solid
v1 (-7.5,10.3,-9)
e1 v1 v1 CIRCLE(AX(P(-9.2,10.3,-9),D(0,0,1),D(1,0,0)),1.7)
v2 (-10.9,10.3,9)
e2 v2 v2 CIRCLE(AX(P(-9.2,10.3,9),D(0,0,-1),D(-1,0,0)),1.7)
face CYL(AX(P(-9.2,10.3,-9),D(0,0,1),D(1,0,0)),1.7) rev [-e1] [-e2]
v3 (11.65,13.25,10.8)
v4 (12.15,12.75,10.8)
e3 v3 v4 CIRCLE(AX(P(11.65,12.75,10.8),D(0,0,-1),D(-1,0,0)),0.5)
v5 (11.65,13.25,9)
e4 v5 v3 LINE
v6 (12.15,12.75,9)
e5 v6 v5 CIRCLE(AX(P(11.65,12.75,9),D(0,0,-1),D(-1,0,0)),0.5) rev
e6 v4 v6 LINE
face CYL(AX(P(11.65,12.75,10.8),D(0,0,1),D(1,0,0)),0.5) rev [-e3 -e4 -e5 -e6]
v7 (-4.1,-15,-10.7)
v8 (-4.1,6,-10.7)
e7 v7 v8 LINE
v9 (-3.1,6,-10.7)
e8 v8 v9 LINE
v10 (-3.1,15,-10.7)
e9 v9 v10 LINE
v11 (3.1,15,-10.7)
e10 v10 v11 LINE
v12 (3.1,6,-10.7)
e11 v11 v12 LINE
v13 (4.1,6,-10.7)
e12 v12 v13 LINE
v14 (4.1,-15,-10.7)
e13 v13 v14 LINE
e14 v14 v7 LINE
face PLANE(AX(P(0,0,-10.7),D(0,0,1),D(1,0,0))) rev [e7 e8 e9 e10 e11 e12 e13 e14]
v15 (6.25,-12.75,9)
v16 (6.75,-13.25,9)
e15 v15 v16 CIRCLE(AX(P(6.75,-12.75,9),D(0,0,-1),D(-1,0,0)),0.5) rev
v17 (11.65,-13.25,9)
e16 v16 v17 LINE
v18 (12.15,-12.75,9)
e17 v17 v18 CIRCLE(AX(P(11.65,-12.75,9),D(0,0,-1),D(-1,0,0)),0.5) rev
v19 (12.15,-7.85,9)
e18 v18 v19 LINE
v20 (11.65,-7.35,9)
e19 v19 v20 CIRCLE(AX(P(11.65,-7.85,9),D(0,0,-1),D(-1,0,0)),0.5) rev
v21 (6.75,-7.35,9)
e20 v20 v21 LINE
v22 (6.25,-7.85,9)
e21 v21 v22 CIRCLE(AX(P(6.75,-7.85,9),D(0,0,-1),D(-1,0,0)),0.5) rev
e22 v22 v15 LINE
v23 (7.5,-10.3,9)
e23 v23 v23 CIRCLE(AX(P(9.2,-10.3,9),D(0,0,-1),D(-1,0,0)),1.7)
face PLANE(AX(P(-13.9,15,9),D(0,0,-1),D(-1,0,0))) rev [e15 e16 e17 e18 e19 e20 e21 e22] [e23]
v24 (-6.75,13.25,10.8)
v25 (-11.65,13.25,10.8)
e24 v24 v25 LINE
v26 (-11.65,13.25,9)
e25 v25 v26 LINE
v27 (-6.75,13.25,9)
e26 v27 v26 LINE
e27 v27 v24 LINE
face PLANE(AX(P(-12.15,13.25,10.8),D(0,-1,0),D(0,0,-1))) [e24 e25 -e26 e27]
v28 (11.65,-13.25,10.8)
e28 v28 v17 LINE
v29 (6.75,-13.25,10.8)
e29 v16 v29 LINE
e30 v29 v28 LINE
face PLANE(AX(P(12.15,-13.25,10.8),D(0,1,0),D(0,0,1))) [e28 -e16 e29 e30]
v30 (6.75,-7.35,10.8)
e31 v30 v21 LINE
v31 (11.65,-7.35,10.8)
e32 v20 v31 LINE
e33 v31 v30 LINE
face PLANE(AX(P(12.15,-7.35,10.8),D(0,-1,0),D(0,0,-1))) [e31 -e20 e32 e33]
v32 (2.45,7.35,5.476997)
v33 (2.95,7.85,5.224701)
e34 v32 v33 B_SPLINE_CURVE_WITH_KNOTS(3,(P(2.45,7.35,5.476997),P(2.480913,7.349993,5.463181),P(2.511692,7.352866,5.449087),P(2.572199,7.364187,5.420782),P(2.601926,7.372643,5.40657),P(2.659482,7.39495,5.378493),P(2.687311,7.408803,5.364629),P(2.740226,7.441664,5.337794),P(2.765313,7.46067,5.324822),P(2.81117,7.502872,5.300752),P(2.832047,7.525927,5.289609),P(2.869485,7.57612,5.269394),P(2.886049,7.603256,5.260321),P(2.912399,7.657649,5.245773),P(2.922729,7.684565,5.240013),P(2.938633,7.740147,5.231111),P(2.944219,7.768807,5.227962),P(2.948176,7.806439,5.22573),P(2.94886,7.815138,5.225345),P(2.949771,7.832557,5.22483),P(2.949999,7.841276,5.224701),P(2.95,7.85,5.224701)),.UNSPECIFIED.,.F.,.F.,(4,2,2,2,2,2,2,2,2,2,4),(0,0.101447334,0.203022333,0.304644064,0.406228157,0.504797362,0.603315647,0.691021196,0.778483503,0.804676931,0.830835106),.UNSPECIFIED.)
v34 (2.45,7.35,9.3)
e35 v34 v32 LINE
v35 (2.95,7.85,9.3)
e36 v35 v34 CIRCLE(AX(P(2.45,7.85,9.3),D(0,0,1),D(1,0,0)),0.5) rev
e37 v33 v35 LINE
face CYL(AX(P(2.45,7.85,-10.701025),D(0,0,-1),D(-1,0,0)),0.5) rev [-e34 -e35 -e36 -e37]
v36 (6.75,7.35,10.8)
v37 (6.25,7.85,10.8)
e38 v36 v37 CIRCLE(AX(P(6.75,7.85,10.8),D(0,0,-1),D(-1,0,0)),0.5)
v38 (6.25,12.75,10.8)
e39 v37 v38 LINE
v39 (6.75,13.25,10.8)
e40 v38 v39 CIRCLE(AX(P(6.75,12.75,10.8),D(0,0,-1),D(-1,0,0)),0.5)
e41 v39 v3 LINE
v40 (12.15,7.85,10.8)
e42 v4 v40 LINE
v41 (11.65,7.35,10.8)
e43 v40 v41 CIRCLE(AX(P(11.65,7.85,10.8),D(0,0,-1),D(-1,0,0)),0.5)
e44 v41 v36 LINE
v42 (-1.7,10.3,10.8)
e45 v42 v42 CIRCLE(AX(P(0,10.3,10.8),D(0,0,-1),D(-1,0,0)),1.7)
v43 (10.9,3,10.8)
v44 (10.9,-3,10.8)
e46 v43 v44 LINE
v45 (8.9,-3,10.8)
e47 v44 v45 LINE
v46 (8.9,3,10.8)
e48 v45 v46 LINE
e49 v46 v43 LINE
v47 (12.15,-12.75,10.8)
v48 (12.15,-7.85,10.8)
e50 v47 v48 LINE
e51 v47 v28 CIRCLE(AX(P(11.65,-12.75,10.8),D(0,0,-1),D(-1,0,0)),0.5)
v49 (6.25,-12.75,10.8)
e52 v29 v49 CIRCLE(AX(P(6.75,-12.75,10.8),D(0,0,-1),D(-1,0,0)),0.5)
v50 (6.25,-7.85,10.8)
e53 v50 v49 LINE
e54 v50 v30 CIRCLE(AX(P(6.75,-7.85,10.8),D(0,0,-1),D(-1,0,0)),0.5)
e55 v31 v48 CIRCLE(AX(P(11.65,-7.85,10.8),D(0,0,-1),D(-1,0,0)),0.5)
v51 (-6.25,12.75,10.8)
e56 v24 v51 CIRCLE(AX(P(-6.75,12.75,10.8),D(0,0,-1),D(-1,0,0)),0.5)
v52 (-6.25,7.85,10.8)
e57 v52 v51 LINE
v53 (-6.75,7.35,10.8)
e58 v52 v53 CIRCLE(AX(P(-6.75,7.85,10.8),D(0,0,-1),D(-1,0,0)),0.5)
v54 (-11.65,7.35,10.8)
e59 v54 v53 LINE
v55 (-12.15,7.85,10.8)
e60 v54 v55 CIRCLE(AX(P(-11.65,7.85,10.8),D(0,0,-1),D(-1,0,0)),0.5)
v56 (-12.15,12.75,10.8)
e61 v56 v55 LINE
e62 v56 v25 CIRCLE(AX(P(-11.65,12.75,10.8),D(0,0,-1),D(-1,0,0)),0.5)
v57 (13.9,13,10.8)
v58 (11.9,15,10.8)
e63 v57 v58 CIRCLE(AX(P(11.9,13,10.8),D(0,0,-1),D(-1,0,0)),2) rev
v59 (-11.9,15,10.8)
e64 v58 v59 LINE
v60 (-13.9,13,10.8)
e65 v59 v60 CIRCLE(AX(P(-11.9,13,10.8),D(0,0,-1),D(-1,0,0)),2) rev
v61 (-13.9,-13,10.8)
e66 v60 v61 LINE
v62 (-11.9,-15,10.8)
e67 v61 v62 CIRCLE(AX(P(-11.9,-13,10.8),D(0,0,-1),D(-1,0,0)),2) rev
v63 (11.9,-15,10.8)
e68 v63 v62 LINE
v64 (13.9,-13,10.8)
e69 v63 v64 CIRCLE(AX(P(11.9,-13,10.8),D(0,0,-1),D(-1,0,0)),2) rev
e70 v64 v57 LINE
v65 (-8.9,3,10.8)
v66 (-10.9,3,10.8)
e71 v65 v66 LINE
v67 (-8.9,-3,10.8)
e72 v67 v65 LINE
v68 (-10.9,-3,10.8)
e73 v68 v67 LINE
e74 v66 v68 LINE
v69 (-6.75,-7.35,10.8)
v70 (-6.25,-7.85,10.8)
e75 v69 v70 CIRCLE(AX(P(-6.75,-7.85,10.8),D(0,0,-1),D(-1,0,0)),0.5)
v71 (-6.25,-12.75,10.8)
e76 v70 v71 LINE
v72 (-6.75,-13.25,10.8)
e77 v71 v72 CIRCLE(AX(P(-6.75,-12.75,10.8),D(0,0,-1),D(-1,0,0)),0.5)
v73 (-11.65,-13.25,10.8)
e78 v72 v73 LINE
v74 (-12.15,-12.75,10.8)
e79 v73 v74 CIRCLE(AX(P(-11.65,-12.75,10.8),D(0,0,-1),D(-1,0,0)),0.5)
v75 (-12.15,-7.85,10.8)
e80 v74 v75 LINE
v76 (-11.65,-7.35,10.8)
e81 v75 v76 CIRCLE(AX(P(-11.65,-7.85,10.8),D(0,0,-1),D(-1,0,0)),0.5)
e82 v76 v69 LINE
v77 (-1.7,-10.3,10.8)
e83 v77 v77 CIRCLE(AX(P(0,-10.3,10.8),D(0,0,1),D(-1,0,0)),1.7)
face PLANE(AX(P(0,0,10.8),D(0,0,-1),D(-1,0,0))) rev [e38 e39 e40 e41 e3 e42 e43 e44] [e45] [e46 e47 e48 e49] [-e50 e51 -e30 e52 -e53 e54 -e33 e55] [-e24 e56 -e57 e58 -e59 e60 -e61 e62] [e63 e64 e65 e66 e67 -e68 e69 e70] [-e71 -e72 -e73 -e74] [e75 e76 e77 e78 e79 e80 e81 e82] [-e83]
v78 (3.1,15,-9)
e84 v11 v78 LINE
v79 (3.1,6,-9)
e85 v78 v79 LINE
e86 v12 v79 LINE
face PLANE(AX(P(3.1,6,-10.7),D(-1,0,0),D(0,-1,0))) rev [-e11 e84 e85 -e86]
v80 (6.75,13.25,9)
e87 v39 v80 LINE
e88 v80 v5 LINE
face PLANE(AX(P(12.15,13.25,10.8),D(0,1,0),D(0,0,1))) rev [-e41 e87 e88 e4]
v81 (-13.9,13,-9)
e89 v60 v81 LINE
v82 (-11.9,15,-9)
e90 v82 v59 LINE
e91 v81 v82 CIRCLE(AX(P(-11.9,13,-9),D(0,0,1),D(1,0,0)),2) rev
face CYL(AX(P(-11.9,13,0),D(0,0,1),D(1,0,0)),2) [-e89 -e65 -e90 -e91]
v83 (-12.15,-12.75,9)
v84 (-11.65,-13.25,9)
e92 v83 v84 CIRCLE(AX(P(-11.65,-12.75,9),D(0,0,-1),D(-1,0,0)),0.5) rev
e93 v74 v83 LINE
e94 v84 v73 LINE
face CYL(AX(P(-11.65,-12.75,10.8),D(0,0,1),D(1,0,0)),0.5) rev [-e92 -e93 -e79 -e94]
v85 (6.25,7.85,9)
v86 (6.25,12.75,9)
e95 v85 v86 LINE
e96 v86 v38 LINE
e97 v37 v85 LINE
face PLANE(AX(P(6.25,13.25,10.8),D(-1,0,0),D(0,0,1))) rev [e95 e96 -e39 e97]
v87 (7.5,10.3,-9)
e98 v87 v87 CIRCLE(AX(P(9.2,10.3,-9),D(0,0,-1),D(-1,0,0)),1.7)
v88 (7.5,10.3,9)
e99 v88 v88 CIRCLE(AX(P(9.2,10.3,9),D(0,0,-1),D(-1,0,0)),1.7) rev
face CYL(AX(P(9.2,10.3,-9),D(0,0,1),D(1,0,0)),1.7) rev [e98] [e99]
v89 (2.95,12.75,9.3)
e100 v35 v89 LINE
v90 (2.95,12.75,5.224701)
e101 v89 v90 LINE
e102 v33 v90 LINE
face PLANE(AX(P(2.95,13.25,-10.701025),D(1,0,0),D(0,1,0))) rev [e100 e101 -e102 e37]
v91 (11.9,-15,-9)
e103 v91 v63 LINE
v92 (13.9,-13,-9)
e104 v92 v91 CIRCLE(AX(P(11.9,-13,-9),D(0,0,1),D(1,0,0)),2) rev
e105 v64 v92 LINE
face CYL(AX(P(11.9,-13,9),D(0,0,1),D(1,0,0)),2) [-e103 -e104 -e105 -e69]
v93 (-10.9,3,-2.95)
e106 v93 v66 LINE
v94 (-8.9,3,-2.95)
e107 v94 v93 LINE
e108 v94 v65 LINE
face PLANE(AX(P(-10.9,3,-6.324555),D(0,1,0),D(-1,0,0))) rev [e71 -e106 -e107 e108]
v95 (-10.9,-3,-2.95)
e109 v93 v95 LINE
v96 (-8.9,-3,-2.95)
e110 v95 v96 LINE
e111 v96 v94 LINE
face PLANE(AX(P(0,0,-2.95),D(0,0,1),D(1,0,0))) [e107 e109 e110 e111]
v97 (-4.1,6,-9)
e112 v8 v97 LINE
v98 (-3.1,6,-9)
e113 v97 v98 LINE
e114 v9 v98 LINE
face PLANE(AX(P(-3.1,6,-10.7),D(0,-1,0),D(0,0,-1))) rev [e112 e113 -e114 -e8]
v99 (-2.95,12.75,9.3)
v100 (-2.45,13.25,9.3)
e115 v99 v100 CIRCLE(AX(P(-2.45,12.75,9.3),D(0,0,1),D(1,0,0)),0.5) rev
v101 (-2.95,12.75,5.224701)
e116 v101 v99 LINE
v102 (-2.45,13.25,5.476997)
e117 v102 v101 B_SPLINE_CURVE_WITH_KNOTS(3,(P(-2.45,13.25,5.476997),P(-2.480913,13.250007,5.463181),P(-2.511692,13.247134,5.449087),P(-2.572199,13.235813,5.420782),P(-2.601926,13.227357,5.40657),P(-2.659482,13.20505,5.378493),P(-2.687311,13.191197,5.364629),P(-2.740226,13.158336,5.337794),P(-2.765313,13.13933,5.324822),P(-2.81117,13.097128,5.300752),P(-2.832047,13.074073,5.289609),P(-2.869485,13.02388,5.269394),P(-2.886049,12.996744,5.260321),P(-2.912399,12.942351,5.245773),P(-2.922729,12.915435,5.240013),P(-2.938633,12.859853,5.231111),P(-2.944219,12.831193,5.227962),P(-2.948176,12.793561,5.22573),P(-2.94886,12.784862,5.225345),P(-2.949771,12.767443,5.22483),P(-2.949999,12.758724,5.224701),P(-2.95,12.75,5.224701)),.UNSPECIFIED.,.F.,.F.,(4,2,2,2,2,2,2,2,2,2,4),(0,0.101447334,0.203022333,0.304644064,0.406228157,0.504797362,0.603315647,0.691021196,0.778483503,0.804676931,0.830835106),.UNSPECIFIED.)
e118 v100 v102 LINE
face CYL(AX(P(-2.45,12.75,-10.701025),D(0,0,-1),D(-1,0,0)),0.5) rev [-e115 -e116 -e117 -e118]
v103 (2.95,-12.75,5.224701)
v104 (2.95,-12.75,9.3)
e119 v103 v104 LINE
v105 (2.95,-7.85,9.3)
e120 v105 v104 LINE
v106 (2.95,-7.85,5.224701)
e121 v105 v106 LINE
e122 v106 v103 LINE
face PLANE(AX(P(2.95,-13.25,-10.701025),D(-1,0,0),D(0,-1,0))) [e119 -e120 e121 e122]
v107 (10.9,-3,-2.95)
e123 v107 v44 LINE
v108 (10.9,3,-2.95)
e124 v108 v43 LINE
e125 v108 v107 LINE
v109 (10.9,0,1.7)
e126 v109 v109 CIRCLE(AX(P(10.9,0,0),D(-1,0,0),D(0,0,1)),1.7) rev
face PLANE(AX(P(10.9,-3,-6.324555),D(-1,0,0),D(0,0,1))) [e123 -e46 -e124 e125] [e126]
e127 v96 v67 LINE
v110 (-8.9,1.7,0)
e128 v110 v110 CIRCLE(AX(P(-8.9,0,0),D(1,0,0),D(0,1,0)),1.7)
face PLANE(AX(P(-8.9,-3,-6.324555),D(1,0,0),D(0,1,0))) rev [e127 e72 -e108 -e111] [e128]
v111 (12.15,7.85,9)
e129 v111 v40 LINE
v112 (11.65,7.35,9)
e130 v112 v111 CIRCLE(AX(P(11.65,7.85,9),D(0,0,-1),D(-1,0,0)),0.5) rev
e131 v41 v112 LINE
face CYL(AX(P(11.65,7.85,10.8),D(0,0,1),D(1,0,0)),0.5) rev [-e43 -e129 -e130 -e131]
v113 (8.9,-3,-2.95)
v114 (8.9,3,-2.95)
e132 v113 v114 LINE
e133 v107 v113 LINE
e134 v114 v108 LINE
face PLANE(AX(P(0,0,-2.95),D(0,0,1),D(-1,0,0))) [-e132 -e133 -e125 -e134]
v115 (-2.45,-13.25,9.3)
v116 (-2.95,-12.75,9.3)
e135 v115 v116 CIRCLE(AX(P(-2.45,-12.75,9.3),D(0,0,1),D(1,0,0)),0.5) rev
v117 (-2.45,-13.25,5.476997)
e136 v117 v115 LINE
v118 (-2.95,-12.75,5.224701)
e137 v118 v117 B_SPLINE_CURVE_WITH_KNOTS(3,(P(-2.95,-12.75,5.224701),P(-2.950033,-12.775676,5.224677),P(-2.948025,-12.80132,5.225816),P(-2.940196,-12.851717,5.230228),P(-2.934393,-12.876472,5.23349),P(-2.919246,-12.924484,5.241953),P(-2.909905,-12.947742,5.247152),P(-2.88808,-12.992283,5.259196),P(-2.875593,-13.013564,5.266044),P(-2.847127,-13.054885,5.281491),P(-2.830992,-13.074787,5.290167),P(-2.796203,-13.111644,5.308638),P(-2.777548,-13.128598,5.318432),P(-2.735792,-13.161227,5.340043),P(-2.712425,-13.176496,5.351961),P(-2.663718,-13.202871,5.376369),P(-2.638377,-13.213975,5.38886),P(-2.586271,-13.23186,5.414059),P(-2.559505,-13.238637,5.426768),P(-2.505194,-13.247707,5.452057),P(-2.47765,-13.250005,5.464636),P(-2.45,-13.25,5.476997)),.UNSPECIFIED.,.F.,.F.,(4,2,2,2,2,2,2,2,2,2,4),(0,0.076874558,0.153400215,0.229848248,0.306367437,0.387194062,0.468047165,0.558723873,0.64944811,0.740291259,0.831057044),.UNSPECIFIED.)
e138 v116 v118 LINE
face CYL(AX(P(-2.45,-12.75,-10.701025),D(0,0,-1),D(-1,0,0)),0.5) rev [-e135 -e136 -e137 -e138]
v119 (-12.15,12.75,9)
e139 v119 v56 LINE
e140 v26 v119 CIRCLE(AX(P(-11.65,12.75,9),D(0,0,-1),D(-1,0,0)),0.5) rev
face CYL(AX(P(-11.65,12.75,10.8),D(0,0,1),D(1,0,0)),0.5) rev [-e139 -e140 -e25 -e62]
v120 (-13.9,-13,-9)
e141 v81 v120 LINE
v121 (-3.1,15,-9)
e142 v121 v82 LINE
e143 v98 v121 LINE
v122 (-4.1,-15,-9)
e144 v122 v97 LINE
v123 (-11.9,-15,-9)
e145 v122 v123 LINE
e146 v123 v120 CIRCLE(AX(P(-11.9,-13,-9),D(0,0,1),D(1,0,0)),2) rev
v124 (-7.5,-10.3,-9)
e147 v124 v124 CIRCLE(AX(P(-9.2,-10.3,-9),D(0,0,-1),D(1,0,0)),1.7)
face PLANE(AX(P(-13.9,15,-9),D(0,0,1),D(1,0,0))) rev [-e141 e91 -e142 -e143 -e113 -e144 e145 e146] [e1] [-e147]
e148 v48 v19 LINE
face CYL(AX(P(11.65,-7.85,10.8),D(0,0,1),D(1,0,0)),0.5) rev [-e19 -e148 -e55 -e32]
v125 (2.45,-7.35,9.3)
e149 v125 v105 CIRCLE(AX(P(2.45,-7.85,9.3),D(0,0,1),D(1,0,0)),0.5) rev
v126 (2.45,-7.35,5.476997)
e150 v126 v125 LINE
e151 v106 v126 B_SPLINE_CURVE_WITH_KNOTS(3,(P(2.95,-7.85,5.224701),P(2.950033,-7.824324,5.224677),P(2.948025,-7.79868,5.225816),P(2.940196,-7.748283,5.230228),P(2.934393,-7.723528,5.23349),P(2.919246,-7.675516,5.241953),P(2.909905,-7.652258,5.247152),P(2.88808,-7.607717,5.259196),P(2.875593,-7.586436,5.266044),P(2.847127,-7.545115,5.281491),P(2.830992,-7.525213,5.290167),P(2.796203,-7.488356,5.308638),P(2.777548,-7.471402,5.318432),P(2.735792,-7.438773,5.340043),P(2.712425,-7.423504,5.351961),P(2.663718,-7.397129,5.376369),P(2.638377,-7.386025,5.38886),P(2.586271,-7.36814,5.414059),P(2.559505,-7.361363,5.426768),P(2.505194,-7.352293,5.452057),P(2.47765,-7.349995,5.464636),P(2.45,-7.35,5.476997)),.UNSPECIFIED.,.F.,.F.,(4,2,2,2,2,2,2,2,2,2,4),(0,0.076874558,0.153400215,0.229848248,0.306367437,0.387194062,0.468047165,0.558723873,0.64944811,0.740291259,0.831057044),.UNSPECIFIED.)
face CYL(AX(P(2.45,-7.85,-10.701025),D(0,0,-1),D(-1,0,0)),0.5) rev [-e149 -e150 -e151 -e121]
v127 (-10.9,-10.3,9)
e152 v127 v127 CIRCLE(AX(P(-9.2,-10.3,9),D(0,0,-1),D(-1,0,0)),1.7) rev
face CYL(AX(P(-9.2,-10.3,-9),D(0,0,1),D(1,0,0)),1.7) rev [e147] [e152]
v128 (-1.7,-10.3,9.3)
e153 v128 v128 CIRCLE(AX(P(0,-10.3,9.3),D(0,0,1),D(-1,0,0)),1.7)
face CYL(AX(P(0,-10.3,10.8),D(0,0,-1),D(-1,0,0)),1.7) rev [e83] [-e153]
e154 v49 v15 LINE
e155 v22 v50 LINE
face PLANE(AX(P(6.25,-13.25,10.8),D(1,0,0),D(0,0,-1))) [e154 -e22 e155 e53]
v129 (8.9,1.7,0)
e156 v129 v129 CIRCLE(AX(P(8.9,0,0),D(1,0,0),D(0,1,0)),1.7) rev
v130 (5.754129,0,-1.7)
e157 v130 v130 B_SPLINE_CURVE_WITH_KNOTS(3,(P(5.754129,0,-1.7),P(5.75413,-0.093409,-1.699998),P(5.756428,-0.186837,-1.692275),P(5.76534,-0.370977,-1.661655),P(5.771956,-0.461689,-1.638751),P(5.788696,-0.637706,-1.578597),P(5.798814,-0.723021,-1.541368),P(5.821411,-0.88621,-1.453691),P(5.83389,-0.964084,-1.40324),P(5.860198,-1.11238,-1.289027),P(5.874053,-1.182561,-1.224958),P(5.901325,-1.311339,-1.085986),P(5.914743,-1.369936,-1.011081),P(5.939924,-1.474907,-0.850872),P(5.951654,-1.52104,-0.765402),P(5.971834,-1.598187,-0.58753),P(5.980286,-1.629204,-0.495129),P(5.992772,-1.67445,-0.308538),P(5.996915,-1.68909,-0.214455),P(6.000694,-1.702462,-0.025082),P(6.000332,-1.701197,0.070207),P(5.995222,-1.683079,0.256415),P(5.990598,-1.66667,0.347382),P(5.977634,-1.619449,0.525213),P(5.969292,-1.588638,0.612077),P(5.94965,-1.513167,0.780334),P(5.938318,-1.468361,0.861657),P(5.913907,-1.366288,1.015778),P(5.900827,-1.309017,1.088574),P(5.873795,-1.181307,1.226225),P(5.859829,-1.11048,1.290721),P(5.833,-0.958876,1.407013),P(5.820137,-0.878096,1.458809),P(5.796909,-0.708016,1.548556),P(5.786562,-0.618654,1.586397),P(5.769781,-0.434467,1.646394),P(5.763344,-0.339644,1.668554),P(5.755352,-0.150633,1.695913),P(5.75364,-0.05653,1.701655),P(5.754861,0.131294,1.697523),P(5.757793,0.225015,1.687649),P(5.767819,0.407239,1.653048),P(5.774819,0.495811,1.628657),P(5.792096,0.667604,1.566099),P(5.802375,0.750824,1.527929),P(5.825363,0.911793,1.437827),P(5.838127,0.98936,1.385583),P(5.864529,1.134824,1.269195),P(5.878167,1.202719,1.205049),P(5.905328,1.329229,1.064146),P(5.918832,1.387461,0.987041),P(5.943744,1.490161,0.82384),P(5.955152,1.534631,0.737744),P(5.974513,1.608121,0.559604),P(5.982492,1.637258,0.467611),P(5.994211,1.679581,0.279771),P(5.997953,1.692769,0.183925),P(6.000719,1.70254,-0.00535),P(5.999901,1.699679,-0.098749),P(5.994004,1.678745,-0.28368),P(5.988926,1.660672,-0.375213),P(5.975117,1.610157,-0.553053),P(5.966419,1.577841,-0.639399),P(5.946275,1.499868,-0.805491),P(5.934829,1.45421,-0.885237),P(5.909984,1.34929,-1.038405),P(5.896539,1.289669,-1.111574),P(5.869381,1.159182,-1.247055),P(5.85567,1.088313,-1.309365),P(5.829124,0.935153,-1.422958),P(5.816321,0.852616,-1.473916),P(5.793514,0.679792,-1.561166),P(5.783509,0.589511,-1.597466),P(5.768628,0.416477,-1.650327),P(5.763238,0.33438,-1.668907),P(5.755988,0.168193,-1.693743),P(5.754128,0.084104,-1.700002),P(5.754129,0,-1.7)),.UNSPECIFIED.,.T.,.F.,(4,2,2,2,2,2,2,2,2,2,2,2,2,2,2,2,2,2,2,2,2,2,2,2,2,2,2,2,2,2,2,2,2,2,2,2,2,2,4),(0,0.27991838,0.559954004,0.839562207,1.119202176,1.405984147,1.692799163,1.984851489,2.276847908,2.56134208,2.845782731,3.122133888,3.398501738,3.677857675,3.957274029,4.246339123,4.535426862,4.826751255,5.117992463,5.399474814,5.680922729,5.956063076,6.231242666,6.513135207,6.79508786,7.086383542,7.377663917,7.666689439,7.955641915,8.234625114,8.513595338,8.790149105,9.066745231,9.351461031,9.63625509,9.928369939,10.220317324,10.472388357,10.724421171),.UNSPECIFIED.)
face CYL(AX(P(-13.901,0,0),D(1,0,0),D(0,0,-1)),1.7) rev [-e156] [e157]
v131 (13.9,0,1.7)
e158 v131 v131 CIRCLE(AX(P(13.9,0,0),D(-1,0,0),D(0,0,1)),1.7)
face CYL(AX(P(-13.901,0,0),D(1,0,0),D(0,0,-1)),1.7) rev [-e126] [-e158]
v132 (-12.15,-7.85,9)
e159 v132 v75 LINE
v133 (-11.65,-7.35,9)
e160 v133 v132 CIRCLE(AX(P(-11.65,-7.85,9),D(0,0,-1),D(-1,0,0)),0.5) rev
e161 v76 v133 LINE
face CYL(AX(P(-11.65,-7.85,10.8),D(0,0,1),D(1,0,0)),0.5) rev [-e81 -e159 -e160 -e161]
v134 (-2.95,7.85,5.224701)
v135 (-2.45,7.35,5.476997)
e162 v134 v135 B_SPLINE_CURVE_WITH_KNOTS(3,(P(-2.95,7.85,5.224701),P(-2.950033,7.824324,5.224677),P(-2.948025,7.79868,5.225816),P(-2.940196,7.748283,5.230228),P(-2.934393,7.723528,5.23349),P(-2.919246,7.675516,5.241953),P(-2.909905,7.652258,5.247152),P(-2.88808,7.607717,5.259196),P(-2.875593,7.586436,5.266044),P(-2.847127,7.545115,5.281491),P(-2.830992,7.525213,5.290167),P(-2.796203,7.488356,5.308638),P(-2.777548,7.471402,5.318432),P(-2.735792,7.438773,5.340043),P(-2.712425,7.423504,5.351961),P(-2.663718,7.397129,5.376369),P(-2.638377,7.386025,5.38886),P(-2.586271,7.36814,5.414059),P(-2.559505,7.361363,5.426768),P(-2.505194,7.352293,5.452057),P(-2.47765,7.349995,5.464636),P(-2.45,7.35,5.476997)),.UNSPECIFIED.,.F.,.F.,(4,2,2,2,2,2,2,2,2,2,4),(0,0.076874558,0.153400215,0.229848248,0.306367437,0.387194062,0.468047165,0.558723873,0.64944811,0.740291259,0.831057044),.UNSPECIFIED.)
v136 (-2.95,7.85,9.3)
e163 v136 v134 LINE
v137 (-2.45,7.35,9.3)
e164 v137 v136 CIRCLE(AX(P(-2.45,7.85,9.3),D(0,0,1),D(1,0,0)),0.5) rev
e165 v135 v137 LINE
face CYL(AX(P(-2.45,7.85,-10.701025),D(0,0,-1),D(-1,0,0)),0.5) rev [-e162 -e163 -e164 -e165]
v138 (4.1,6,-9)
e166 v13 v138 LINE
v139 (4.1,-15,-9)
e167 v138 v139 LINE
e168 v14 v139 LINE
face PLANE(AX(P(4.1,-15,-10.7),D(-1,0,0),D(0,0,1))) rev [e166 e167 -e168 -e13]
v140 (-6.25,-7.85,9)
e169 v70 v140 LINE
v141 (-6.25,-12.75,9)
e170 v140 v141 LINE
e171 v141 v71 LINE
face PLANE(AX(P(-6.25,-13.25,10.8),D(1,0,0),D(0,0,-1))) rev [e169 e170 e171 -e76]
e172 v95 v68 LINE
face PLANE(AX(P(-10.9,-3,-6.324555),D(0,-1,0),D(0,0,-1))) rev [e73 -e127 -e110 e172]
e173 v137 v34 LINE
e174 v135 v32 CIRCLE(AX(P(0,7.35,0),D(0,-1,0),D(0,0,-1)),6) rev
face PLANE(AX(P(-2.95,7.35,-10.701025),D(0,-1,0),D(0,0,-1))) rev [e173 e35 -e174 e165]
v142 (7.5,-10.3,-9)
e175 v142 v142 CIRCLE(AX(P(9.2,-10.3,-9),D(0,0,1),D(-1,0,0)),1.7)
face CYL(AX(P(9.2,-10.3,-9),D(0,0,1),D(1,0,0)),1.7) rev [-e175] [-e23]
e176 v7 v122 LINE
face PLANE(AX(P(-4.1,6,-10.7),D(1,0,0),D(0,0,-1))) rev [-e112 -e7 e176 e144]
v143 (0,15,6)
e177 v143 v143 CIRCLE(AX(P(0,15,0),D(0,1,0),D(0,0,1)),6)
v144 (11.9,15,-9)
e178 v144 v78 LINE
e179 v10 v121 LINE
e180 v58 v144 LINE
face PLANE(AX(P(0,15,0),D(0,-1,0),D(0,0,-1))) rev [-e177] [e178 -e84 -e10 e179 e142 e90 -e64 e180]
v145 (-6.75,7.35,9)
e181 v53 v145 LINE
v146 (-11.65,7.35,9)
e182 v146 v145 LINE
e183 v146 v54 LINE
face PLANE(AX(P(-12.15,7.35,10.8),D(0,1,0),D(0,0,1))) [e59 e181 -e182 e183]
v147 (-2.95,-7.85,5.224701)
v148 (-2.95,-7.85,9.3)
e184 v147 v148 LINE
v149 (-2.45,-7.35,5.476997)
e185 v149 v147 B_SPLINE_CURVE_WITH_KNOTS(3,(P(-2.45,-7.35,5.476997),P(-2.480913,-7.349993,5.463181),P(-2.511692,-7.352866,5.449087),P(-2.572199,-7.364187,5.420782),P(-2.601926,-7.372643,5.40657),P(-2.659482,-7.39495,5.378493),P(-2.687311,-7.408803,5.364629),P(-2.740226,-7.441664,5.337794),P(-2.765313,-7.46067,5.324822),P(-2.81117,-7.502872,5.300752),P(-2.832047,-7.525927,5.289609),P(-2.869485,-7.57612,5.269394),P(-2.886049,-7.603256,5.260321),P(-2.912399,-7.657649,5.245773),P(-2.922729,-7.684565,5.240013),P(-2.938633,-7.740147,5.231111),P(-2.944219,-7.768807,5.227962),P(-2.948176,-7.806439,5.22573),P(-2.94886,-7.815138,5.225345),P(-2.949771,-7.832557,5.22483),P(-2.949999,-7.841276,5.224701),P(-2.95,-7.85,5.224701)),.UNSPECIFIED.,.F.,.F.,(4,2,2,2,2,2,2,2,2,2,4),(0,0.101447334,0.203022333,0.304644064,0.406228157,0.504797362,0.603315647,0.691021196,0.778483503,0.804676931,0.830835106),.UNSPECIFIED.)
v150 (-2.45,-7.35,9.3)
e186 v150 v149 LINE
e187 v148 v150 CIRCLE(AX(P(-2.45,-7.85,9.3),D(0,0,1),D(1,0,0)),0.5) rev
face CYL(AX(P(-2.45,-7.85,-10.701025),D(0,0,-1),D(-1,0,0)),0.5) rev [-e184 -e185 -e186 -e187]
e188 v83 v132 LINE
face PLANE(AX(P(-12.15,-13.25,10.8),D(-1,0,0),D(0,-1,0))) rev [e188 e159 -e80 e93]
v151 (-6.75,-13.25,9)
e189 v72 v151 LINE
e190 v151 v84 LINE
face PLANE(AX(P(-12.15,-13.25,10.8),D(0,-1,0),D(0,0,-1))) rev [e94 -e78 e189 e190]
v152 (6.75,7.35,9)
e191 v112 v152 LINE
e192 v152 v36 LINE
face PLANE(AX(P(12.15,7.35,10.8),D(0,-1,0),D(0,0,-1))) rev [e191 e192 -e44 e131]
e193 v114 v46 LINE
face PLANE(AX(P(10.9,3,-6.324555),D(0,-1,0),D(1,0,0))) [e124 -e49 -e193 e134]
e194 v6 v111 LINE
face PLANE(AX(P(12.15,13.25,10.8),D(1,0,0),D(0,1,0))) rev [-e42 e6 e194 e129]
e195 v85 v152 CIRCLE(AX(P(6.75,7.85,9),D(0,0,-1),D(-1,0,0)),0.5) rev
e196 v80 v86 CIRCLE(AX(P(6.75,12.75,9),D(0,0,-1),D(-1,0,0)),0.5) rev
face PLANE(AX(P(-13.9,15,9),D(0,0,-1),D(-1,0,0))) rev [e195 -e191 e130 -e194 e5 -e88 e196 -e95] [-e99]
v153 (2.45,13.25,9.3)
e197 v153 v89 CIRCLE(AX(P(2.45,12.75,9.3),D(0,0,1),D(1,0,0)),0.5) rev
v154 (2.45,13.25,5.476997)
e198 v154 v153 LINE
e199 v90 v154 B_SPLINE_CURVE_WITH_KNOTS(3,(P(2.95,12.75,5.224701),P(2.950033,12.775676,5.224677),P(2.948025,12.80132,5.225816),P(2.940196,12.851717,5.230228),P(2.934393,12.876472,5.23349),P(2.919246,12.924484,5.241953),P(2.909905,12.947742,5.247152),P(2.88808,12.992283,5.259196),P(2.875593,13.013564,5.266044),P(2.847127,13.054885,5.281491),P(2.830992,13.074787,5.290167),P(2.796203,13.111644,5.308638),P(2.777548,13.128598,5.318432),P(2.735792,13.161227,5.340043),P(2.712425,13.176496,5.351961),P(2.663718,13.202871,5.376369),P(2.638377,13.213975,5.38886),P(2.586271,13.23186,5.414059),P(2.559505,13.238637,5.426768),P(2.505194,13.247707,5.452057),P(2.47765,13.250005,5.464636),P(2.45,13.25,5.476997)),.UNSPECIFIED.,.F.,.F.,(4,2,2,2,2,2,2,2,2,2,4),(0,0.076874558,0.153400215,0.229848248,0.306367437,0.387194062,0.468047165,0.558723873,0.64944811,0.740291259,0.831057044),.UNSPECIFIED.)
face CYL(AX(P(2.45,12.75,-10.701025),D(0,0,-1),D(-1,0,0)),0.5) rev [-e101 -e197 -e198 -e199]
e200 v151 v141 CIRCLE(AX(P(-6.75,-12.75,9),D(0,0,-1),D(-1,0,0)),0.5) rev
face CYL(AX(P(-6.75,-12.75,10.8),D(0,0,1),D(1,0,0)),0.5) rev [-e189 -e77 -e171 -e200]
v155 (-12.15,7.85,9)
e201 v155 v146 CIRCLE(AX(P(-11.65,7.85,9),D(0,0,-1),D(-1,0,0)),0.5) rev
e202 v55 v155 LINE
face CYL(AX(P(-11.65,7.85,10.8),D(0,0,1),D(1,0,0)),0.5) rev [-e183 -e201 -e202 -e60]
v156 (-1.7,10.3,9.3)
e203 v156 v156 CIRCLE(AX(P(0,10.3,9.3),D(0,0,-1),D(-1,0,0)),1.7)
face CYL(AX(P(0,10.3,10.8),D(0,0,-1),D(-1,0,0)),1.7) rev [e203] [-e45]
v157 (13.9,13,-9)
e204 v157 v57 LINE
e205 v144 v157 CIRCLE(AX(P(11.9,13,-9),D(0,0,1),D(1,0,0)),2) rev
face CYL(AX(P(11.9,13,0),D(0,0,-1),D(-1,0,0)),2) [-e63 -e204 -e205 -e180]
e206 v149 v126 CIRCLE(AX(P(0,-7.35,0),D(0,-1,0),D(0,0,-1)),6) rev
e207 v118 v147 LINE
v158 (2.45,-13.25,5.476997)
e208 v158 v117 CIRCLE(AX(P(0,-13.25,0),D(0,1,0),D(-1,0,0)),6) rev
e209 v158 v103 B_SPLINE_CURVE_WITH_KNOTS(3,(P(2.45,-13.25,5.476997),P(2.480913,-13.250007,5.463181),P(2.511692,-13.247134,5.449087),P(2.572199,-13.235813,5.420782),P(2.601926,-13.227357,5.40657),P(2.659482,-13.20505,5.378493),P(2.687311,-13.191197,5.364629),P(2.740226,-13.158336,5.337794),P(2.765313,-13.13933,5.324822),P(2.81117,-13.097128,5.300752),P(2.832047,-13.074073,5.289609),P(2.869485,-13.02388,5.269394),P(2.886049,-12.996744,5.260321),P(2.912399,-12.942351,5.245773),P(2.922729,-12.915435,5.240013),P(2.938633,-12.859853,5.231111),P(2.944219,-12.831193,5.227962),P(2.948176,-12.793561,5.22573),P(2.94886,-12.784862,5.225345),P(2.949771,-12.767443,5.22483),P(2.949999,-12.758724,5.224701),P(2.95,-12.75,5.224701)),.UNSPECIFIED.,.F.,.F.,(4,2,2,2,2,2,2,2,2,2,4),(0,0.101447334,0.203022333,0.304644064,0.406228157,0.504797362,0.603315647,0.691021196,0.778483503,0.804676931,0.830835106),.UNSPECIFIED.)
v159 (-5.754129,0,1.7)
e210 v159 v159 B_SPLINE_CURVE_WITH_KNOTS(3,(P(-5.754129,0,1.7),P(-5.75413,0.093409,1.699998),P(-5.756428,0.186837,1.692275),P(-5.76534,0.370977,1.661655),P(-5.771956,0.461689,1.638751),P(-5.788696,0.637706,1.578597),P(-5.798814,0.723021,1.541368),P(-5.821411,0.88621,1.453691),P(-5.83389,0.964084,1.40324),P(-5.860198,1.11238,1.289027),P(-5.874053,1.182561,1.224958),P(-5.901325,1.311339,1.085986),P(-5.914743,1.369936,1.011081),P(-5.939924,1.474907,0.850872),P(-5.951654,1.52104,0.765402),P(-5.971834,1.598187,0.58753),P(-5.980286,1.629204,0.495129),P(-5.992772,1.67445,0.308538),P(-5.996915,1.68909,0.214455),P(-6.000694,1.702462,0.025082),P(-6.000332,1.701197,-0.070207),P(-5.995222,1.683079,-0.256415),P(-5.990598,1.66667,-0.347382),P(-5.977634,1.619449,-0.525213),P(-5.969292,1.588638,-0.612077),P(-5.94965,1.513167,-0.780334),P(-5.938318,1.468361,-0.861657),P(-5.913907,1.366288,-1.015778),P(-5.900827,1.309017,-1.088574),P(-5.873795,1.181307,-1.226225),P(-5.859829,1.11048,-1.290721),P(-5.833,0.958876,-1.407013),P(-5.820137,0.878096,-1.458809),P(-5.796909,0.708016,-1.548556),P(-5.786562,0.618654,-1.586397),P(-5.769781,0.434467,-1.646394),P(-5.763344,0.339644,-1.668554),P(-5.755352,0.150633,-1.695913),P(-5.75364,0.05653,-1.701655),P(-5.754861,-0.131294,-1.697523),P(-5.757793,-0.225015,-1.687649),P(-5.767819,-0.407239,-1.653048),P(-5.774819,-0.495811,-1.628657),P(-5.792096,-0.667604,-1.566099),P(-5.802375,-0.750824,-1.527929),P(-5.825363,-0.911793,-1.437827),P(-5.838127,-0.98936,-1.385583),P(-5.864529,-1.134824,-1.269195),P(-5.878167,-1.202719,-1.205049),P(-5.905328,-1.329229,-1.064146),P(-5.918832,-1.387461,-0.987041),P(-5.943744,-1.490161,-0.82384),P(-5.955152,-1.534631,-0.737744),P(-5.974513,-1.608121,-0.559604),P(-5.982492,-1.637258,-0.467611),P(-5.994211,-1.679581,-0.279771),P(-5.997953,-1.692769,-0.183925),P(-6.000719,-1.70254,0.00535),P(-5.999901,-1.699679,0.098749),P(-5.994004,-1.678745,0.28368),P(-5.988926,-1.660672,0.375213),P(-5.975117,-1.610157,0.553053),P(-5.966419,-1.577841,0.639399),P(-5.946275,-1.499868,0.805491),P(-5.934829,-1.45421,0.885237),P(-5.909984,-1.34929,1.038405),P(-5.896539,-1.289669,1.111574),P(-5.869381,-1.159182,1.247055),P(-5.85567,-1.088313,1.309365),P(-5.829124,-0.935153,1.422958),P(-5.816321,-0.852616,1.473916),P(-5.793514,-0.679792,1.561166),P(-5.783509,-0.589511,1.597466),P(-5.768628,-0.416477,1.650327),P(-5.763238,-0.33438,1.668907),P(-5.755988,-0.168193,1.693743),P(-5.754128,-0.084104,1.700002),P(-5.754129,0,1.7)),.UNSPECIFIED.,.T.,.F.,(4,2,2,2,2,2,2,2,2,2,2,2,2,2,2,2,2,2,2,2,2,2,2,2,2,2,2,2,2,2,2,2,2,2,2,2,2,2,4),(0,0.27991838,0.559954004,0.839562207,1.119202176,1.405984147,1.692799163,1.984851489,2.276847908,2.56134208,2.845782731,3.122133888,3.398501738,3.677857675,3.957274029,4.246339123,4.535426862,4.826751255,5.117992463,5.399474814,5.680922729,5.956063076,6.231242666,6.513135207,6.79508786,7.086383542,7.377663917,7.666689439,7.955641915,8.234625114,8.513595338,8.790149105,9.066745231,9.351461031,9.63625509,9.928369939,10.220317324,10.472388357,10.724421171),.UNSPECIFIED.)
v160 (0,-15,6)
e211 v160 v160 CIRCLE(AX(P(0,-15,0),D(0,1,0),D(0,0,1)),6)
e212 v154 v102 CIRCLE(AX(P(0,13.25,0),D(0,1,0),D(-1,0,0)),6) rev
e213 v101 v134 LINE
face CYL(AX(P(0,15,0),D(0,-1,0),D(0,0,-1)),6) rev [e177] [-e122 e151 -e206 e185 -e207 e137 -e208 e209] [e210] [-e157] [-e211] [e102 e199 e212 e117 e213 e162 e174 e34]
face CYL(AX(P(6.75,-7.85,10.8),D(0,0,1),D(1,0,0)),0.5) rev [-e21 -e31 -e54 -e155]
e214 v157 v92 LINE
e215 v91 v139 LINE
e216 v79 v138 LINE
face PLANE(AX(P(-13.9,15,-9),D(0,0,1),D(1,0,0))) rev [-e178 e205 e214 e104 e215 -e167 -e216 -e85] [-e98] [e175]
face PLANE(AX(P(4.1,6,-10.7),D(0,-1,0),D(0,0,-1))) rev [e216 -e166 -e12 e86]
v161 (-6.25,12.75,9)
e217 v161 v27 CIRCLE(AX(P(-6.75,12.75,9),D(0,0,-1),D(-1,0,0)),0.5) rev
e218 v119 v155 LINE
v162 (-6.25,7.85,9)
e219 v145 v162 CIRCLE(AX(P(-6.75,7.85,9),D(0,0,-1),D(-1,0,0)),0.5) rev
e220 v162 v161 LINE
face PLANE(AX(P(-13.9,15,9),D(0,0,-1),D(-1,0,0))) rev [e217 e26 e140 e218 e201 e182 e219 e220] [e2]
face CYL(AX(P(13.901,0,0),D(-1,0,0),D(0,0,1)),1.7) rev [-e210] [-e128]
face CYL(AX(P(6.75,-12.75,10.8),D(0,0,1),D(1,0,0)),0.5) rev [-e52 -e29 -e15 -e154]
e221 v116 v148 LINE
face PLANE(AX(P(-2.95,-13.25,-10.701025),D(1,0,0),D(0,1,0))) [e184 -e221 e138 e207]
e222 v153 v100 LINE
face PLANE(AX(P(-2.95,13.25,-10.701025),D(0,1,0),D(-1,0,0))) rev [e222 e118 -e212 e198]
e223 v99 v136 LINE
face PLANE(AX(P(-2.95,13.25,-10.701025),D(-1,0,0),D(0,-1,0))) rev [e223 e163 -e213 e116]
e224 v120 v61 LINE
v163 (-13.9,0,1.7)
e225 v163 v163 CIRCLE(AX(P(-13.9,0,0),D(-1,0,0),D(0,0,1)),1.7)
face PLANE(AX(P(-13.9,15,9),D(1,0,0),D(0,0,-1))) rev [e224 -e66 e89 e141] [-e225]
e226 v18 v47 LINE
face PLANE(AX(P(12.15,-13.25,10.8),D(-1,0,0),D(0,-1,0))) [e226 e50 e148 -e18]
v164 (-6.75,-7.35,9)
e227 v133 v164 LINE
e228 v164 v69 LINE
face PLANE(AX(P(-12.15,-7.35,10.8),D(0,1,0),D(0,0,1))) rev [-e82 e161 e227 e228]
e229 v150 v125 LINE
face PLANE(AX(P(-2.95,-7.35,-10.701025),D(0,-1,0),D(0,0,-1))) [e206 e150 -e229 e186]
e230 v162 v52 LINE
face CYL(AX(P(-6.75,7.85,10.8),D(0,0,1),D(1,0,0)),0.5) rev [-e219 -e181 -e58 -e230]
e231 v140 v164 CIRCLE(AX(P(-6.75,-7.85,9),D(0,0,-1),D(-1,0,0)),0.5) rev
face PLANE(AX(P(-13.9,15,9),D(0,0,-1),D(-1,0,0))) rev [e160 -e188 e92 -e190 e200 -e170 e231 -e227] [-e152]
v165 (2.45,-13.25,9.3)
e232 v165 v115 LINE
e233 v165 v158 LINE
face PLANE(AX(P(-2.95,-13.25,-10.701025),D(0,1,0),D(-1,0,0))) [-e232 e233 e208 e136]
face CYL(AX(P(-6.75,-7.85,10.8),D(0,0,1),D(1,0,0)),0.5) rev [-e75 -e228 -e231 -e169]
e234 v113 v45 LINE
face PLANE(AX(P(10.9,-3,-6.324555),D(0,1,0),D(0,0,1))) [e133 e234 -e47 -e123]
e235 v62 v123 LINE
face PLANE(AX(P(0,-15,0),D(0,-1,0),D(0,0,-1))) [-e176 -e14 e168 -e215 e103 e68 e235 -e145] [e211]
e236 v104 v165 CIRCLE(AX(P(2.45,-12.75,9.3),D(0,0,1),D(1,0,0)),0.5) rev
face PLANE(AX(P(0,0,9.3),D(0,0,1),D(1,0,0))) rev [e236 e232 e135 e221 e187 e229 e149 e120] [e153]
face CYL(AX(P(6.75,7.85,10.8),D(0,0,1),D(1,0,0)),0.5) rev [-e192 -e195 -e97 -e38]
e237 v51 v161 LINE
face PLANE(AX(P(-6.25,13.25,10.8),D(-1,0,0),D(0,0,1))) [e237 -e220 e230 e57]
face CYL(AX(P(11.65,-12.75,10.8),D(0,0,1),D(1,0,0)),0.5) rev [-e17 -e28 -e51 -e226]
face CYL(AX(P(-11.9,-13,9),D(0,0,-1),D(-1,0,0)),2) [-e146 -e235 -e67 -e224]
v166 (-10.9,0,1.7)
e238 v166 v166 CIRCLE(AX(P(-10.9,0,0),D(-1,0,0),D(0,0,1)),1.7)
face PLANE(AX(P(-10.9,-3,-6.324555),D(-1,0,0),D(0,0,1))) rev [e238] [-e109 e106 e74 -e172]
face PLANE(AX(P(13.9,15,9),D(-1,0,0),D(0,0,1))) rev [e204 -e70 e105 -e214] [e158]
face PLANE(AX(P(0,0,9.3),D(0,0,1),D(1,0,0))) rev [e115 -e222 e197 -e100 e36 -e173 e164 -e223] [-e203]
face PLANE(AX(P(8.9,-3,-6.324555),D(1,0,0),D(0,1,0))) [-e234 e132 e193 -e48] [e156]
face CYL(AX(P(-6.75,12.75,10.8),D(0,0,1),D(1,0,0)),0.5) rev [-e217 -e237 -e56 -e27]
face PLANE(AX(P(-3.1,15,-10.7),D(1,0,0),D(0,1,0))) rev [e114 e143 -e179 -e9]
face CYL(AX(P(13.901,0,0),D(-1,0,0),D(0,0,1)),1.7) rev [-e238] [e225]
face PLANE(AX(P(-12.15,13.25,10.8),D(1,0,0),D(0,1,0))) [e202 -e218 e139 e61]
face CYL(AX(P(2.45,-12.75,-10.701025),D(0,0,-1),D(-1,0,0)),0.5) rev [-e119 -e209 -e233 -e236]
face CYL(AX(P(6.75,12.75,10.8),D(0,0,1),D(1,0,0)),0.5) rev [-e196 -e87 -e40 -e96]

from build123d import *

# Parameters (mm, degrees)
SKETCH2_W               = 27.8
SKETCH2_H               = 18
SKETCH2_R               = 6
BOSS_EXTRUDE1_DEPTH     = 15
SKETCH7_W               = 13.9
SKETCH7_H               = 15
SKETCH7_W_2             = 5.9
SKETCH7_H_2             = 5.9
BOSS_EXTRUDE3_DEPTH     = 1.8
SKETCH8_R               = 1.7
CUT_EXTRUDE3_DEPTH      = 29.464890655
FILLET4_R               = 0.5
FILLET4_OF_MIRROR1_R    = 0.5
MIRROR2_START           = -9
MIRROR2_OUTLINE_R       = 1.7
MIRROR2_DEPTH           = 18
MIRROR2_START_2         = 9
MIRROR2_2_OUTLINE_W     = 13.9
MIRROR2_2_OUTLINE_H     = 30
MIRROR2_2_DEPTH         = 1.8
FILLET3_R               = 2
BOSS_EXTRUDE4_DEPTH     = 1.7
CUT_EXTRUDE4_REACH      = 33.173
CUT_EXTRUDE4_END_RADIUS = 6
CUT_EXTRUDE4_START      = -1.5
SKETCH10_W              = 5.9
SKETCH10_H              = 5.9
FILLET5_R               = 0.5
SKETCH11_R              = 1.7
CUT_EXTRUDE5_DEPTH      = 29.604370348
FILLET5_OF_MIRROR3_R    = 0.5
CUT_EXTRUDE6_START      = -10.8
SKETCH12_W              = 2
SKETCH12_H              = 6
CUT_EXTRUDE6_DEPTH      = 10.8
SKETCH13_W              = 2
SKETCH13_H              = 6
CUT_EXTRUDE7_DEPTH      = 2.95
CUT_EXTRUDE8_REACH      = 35.384
CUT_EXTRUDE8_END_RADIUS = 6
SKETCH14_R              = 1.7


# Read off the part's stored shape, not the designer's step: Mirror2
with BuildPart() as part:
    # Sketch2 → Boss-Extrude1 (new, symmetric)
    with BuildSketch(Plane(origin=(0, 0, 0), x_dir=(1, 0, 0), z_dir=(0, 1, 0))):
        Rectangle(SKETCH2_W, SKETCH2_H)
        with Locations(Location((0, 0, 0), (0, 0, 270))):
            Circle(SKETCH2_R, mode=Mode.SUBTRACT)
    extrude(amount=BOSS_EXTRUDE1_DEPTH, both=True)

    # Sketch7 → Boss-Extrude3 (add)
    with BuildSketch(Plane.XY.offset(9)):
        with Locations((-6.95, 7.5)):
            Rectangle(SKETCH7_W, SKETCH7_H)
        with Locations((-9.2, 10.3)):
            Rectangle(SKETCH7_W_2, SKETCH7_H_2, mode=Mode.SUBTRACT)
    boss_extrude3 = extrude(amount=BOSS_EXTRUDE3_DEPTH)

    # Sketch8 → Cut-Extrude3 (cut, through all)
    with BuildSketch(Plane.XY.offset(10.8)):
        with Locations((-9.2, 10.3)):
            Circle(SKETCH8_R)
    cut_extrude3 = extrude(amount=-CUT_EXTRUDE3_DEPTH, mode=Mode.SUBTRACT)

    # Fillet4
    fillet4_edges = [part.edges().sort_by_distance(p)[0] for p in [
        (-6.25, 13.25, 9.9),
        (-12.15, 13.25, 9.9),
        (-12.15, 7.35, 9.9),
        (-6.25, 7.35, 9.9),
    ]]
    fillet(fillet4_edges, radius=FILLET4_R)

    # Mirror1: Boss-Extrude3, Cut-Extrude3 across plane
    add(boss_extrude3.mirror(Plane.ZX))
    add(cut_extrude3.mirror(Plane.ZX), mode=Mode.SUBTRACT)

    # Fillet4 of Mirror1
    fillet4_of_mirror1_edges = [part.edges().sort_by_distance(p)[0] for p in [
        (-6.25, -13.25, 9.9),
        (-12.15, -13.25, 9.9),
        (-12.15, -7.35, 9.9),
        (-6.25, -7.35, 9.9),
    ]]
    fillet(fillet4_of_mirror1_edges, radius=FILLET4_OF_MIRROR1_R)

    # Mirror2 outline → Mirror2 (cut)
    with BuildSketch(Plane.XY.offset(MIRROR2_START)):
        with Locations((9.2, -10.3)):
            Circle(MIRROR2_OUTLINE_R)
        with Locations((9.2, 10.3)):
            Circle(MIRROR2_OUTLINE_R)
    extrude(amount=MIRROR2_DEPTH, mode=Mode.SUBTRACT)

    # Mirror2 2 outline → Mirror2 2 (add)
    with BuildSketch(Plane.XY.offset(MIRROR2_START_2)):
        with Locations((6.95, 0)):
            Rectangle(MIRROR2_2_OUTLINE_W, MIRROR2_2_OUTLINE_H)
        with BuildLine():
            ThreePointArc((6.25, -7.85), (6.396446609, -7.496446609), (6.75, -7.35))
            Line((6.75, -7.35), (11.65, -7.35))
            ThreePointArc((11.65, -7.35), (12.003553391, -7.496446609), (12.15, -7.85))
            Line((12.15, -7.85), (12.15, -12.75))
            ThreePointArc((12.15, -12.75), (12.003553391, -13.103553391), (11.65, -13.25))
            Line((11.65, -13.25), (6.75, -13.25))
            ThreePointArc((6.75, -13.25), (6.396446609, -13.103553391), (6.25, -12.75))
            Line((6.25, -12.75), (6.25, -7.85))
        make_face(mode=Mode.SUBTRACT)
        with BuildLine():
            Line((6.75, 13.25), (11.65, 13.25))
            ThreePointArc((11.65, 13.25), (12.003553391, 13.103553391), (12.15, 12.75))
            Line((12.15, 12.75), (12.15, 7.85))
            ThreePointArc((12.15, 7.85), (12.003553391, 7.496446609), (11.65, 7.35))
            Line((11.65, 7.35), (6.75, 7.35))
            ThreePointArc((6.75, 7.35), (6.396446609, 7.496446609), (6.25, 7.85))
            Line((6.25, 7.85), (6.25, 12.75))
            ThreePointArc((6.25, 12.75), (6.396446609, 13.103553391), (6.75, 13.25))
        make_face(mode=Mode.SUBTRACT)
    extrude(amount=MIRROR2_2_DEPTH)

    # Fillet3
    fillet3_edges = [part.edges().sort_by_distance(p)[0] for p in [
        (-13.9, 15, 0.9),
        (13.9, 15, 0.9),
        (-13.9, -15, 0.9),
        (13.9, -15, 0.9),
    ]]
    fillet(fillet3_edges, radius=FILLET3_R)

    # Sketch9 → Boss-Extrude4 (add)
    with BuildSketch(Plane(origin=(0, 0, -9), x_dir=(-1, 0, 0), z_dir=(0, 0, -1))):
        Polygon((-3.1, 15), (3.1, 15), (3.1, 6), (4.1, 6), (4.1, -15), (-4.1, -15), (-4.1, 6), (-3.1, 6), align=None)
    extrude(amount=BOSS_EXTRUDE4_DEPTH)

    # Cut-Extrude4: up to this cylinder (the profile starts outside it)
    cut_extrude4_end = Plane(origin=(0, 10.3, 0), z_dir=(0, -1, 0)) * Cylinder(CUT_EXTRUDE4_END_RADIUS, 79.346, mode=Mode.PRIVATE)
    # Sketch10 → Cut-Extrude4 (cut, up to the surface)
    with BuildSketch(Plane.XY.offset(10.8).offset(CUT_EXTRUDE4_START), mode=Mode.PRIVATE) as cut_extrude4_sk1:
        with Locations((0, 10.3)):
            Rectangle(SKETCH10_W, SKETCH10_H)
    cut_extrude4_tool1 = extrude(cut_extrude4_sk1.sketch, amount=-CUT_EXTRUDE4_REACH, mode=Mode.PRIVATE) - cut_extrude4_end
    cut_extrude4 = cut_extrude4_tool1.solids().sort_by_distance((0, 10.3, 9.3))[0]
    add(cut_extrude4, mode=Mode.SUBTRACT)

    # Fillet5
    fillet5_edges = [part.edges().sort_by_distance(p)[0] for p in [
        (2.95, 13.25, 7.262350474),
        (2.95, 7.35, 7.262350474),
        (-2.95, 7.35, 7.262350474),
        (-2.95, 13.25, 7.262350474),
    ]]
    fillet(fillet5_edges, radius=FILLET5_R)

    # Sketch11 → Cut-Extrude5 (cut, through all)
    with BuildSketch(Plane(origin=(0, 0, 9.3), x_dir=(-1, 0, 0), z_dir=(0, 0, -1))):
        with Locations((0, 10.3)):
            Circle(SKETCH11_R)
    cut_extrude5 = extrude(amount=-CUT_EXTRUDE5_DEPTH, mode=Mode.SUBTRACT)

    # Mirror3: Cut-Extrude4, Cut-Extrude5 across plane
    add(cut_extrude4.mirror(Plane.ZX), mode=Mode.SUBTRACT)
    add(cut_extrude5.mirror(Plane.ZX), mode=Mode.SUBTRACT)

    # Fillet5 of Mirror3
    fillet5_of_mirror3_edges = [part.edges().sort_by_distance(p)[0] for p in [
        (2.95, -13.25, 7.262350474),
        (2.95, -7.35, 7.262350474),
        (-2.95, -7.35, 7.262350474),
        (-2.95, -13.25, 7.262350474),
    ]]
    fillet(fillet5_of_mirror3_edges, radius=FILLET5_OF_MIRROR3_R)

    # Sketch12 → Cut-Extrude6 (cut)
    with BuildSketch(Plane.XY.offset(10.8).offset(CUT_EXTRUDE6_START)):
        with Locations((-9.9, 0)):
            Rectangle(SKETCH12_W, SKETCH12_H)
    cut_extrude6 = extrude(amount=CUT_EXTRUDE6_DEPTH, mode=Mode.SUBTRACT)

    # Sketch13 → Cut-Extrude7 (cut)
    with BuildSketch(Plane.XY):
        with Locations((-9.9, 0)):
            Rectangle(SKETCH13_W, SKETCH13_H)
    cut_extrude7 = extrude(amount=-CUT_EXTRUDE7_DEPTH, mode=Mode.SUBTRACT)

    # Cut-Extrude8: up to this cylinder (the profile starts outside it)
    cut_extrude8_end = Plane(origin=(0, 0, 0), z_dir=(0, -1, 0)) * Cylinder(CUT_EXTRUDE8_END_RADIUS, 83.768, mode=Mode.PRIVATE)
    # Sketch14 → Cut-Extrude8 (cut, up to the surface)
    with BuildSketch(Plane.ZY.offset(13.9), mode=Mode.PRIVATE) as cut_extrude8_sk1:
        Circle(SKETCH14_R)
    cut_extrude8_tool1 = extrude(cut_extrude8_sk1.sketch, amount=-CUT_EXTRUDE8_REACH, mode=Mode.PRIVATE) - cut_extrude8_end
    cut_extrude8 = cut_extrude8_tool1.solids().sort_by_distance((-13.9, 0, 0))[0]
    add(cut_extrude8, mode=Mode.SUBTRACT)

    # Mirror4: Cut-Extrude6, Cut-Extrude7, Cut-Extrude8 across plane
    add(cut_extrude6.mirror(Plane(origin=(0, 0, 0), x_dir=(0, 0, 1), z_dir=(1, 0, 0))), mode=Mode.SUBTRACT)
    add(cut_extrude7.mirror(Plane(origin=(0, 0, 0), x_dir=(0, 0, 1), z_dir=(1, 0, 0))), mode=Mode.SUBTRACT)
    add(cut_extrude8.mirror(Plane(origin=(0, 0, 0), x_dir=(0, 0, 1), z_dir=(1, 0, 0))), mode=Mode.SUBTRACT)


solid = part.part
